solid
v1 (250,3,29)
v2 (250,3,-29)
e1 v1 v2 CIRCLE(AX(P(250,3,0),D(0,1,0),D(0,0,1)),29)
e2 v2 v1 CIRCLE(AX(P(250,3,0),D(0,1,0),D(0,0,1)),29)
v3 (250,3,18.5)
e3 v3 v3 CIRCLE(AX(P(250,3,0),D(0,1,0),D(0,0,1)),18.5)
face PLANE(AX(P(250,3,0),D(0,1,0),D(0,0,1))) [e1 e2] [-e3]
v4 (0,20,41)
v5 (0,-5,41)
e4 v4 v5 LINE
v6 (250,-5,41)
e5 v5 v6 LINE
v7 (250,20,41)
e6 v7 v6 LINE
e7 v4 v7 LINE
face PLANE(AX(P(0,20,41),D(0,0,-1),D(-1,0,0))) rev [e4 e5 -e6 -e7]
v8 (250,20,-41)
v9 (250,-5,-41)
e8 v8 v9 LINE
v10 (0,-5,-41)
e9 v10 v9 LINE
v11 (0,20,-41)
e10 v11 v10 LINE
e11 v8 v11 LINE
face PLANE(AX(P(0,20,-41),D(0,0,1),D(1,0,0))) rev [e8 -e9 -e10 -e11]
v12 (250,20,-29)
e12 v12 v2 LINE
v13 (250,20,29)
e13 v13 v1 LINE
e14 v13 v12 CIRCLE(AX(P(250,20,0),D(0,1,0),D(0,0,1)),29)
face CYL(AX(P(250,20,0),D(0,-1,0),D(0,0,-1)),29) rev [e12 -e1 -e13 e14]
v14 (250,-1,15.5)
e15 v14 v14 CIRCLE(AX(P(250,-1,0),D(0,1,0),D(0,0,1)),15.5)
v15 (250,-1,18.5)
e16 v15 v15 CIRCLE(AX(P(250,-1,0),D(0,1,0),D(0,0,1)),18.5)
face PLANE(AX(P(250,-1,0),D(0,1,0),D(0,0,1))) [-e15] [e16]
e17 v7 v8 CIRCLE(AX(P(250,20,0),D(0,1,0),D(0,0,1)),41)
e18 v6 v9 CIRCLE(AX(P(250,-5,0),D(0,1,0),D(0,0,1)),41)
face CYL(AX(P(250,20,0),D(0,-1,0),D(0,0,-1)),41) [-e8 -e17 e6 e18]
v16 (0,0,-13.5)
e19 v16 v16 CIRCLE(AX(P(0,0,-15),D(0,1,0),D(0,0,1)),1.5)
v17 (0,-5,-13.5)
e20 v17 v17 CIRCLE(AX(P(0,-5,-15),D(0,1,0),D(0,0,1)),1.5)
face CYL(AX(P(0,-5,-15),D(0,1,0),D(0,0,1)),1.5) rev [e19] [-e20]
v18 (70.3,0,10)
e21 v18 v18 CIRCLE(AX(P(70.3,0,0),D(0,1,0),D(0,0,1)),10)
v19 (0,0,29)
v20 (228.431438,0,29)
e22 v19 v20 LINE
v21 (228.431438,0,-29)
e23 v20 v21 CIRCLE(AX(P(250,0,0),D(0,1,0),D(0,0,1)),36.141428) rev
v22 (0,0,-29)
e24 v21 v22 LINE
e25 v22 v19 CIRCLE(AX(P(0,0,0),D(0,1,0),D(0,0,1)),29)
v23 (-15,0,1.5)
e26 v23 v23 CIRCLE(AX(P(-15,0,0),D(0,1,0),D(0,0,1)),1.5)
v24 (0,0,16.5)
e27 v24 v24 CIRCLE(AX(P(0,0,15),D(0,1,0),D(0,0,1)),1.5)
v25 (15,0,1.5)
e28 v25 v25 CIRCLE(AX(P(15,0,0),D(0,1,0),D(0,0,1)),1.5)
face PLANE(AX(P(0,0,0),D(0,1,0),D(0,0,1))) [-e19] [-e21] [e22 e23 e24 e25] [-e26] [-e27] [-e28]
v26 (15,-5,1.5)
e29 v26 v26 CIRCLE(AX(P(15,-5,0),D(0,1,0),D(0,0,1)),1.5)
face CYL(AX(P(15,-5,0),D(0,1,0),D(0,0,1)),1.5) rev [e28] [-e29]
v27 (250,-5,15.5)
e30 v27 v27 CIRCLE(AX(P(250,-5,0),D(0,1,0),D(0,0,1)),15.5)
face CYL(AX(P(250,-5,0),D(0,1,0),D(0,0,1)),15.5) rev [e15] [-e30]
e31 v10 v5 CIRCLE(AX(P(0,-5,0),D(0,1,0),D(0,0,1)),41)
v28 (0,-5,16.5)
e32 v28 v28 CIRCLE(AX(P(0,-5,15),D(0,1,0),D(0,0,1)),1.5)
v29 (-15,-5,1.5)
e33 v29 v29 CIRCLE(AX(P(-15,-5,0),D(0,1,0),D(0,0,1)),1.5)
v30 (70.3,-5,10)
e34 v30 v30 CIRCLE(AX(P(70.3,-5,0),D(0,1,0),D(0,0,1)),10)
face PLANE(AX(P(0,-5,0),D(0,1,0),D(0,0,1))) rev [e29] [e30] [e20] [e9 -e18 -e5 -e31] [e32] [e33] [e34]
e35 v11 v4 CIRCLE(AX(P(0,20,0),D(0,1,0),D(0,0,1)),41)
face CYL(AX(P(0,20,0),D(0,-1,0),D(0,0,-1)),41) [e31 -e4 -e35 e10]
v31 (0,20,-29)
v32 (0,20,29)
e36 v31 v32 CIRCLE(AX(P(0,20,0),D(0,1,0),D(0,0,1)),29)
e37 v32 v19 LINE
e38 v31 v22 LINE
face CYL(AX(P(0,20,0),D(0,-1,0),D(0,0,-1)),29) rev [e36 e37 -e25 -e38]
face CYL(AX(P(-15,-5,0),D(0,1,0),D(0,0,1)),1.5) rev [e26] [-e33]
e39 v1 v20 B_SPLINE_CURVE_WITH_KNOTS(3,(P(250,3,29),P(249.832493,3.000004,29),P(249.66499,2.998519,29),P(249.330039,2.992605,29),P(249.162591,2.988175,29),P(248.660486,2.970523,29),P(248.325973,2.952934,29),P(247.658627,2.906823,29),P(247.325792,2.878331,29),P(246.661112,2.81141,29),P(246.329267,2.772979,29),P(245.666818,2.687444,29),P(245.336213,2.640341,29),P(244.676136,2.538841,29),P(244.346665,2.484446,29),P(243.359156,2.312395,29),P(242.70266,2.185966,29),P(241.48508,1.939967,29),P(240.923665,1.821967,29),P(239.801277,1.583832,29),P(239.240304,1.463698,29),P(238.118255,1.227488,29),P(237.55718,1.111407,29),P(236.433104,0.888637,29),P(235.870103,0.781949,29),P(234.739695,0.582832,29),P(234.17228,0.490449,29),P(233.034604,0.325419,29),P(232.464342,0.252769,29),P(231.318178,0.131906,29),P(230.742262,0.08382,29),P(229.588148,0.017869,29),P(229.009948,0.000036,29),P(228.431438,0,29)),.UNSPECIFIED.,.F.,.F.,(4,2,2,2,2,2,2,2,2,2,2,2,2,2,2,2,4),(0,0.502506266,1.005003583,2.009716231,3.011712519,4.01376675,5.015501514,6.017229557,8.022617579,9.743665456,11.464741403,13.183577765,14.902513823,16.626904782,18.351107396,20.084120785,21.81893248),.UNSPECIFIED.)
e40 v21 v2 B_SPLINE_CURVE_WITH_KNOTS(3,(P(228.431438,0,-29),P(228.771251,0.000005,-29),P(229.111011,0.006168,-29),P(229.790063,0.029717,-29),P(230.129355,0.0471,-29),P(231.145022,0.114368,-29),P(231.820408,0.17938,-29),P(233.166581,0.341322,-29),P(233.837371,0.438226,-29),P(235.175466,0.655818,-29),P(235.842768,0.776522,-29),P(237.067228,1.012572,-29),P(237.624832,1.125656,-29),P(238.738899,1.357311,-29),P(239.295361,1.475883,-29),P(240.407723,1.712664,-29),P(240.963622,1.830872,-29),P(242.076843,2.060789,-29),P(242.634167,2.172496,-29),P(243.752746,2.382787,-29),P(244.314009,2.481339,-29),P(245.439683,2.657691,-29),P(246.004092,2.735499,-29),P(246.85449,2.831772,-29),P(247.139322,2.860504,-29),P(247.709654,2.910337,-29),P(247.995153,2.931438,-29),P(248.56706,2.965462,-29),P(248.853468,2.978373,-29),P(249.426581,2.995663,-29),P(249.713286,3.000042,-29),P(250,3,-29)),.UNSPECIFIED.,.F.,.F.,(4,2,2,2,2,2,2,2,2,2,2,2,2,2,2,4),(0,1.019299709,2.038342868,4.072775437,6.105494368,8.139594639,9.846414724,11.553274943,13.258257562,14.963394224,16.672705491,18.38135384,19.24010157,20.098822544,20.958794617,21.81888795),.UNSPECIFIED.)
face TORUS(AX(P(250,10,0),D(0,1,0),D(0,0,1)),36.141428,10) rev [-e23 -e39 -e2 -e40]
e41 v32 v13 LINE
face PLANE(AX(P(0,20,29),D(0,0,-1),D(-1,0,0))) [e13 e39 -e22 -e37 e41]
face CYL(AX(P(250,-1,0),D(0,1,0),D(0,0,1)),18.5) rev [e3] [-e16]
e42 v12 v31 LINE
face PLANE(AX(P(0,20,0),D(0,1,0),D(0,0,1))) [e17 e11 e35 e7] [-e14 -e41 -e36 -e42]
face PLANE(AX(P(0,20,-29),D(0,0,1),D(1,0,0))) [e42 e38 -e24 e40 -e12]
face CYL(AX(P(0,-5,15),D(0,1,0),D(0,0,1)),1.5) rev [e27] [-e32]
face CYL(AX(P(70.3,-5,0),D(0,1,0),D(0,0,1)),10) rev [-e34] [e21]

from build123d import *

# Parameters (mm, degrees)
BOSS_EXTRUDE1_DEPTH     = 20
BOSS_EXTRUDE2_START     = -5
BOSS_EXTRUDE2_DEPTH     = 5
CUT_EXTRUDE1_DEPTH      = 295.553899991
CUT_EXTRUDE1_DEPTH_BACK = 295.553899991
SKETCH3_R               = 1.5
SKETCH4_R               = 29
BOSS_EXTRUDE3_DEPTH     = 3
SKETCH5_R               = 18.5
CUT_EXTRUDE2_DEPTH      = 4
CUT_EXTRUDE3_DEPTH      = 295.623488541
CUT_EXTRUDE3_DEPTH_BACK = 295.623488541
SKETCH6_R               = 15.5
FILLET1_R               = 10
CUT_EXTRUDE4_DEPTH      = 295.553899998
CUT_EXTRUDE4_DEPTH_BACK = 295.553899998
SKETCH7_R               = 10


with BuildPart() as part:
    # Sketch1 → Boss-Extrude1 (new body)
    with BuildSketch(Plane(origin=(0, 0, 0), x_dir=(1, 0, 0), z_dir=(0, 1, 0))):
        with BuildLine():
            Line((0, -41), (250, -41))
            ThreePointArc((250, -41), (291, 0), (250, 41))
            Line((250, 41), (0, 41))
            ThreePointArc((0, 41), (-41, 0), (0, -41))
        make_face()
        with BuildLine():
            Line((0, 29), (250, 29))
            ThreePointArc((250, 29), (279, 0), (250, -29))
            Line((250, -29), (0, -29))
            ThreePointArc((0, -29), (-29, 0), (0, 29))
        make_face(mode=Mode.SUBTRACT)
    extrude(amount=BOSS_EXTRUDE1_DEPTH)

    # Sketch1<2> → Boss-Extrude2 (add)
    with BuildSketch(Plane(origin=(0, 0, 0), x_dir=(1, 0, 0), z_dir=(0, 1, 0)).offset(BOSS_EXTRUDE2_START)):
        with BuildLine():
            ThreePointArc((0, 41), (-41, 0), (0, -41))
            Line((0, -41), (250, -41))
            ThreePointArc((250, -41), (291, 0), (250, 41))
            Line((250, 41), (0, 41))
        make_face()
    extrude(amount=BOSS_EXTRUDE2_DEPTH)

    # Sketch3 → Cut-Extrude1 (cut, two sides: drawn at the far end of the back side and taken through both)
    with BuildSketch(Plane(origin=(0, 0, 0), x_dir=(1, 0, 0), z_dir=(0, 1, 0)).offset(-CUT_EXTRUDE1_DEPTH_BACK)):
        with Locations(Location((0, 15, 0), (0, 0, 270))):
            Circle(SKETCH3_R)
        with Locations(Location((15, 0, 0), (0, 0, 270))):
            Circle(SKETCH3_R)
        with Locations(Location((0, -15, 0), (0, 0, 270))):
            Circle(SKETCH3_R)
        with Locations(Location((-15, 0, 0), (0, 0, 270))):
            Circle(SKETCH3_R)
    extrude(amount=CUT_EXTRUDE1_DEPTH + CUT_EXTRUDE1_DEPTH_BACK, mode=Mode.SUBTRACT)

    # Sketch4 → Boss-Extrude3 (add)
    with BuildSketch(Plane(origin=(0, 0, 0), x_dir=(1, 0, 0), z_dir=(0, 1, 0))):
        with Locations((250, 0)):
            Circle(SKETCH4_R)
    extrude(amount=BOSS_EXTRUDE3_DEPTH)

    # Sketch5 → Cut-Extrude2 (cut)
    with BuildSketch(Plane(origin=(0, 3, 0), x_dir=(1, 0, 0), z_dir=(0, 1, 0))):
        with Locations(Location((250, 0, 0), (0, 0, 270))):
            Circle(SKETCH5_R)
    extrude(amount=-CUT_EXTRUDE2_DEPTH, mode=Mode.SUBTRACT)

    # Sketch6 → Cut-Extrude3 (cut, two sides: drawn at the far end of the back side and taken through both)
    with BuildSketch(Plane(origin=(0, -1, 0), x_dir=(1, 0, 0), z_dir=(0, 1, 0)).offset(-CUT_EXTRUDE3_DEPTH_BACK)):
        with Locations(Location((250, 0, 0), (0, 0, 270))):
            Circle(SKETCH6_R)
    extrude(amount=CUT_EXTRUDE3_DEPTH + CUT_EXTRUDE3_DEPTH_BACK, mode=Mode.SUBTRACT)

    # Fillet1
    # the kernel refuses this fillet: 10 mm, written as the material it adds along each edge
    with BuildSketch(Plane(origin=(250, 0, 0), x_dir=(0.5782894613752282, 0, -0.8158316608604672), z_dir=(0.8158316608604672, 0, 0.5782894613752282))) as fillet1_piece_1:
        with BuildLine():
            CenterArc((36.141428429, 10), FILLET1_R, 224.427004001, 45.572995999)
            Line((36.141428429, 0), (36.141428429, -0.2))
            Line((36.141428429, -0.2), (29, -0.2))
            Line((29, -0.2), (28.8, 0))
            ThreePointArc((28.8, 0), (28.8, 1.5), (28.857171431, 2.86))
            Line((28.857171431, 2.86), (29, 3))
        make_face()
    revolve(axis=Axis((250, 0, 0), (0, 1, 0)), revolution_arc=250.660644369)

    # Sketch7 → Cut-Extrude4 (cut, two sides: drawn at the far end of the back side and taken through both)
    with BuildSketch(Plane(origin=(0, 0, 0), x_dir=(1, 0, 0), z_dir=(0, 1, 0)).offset(-CUT_EXTRUDE4_DEPTH_BACK)):
        with Locations(Location((70.3, 0, 0), (0, 0, 270))):
            Circle(SKETCH7_R)
    extrude(amount=CUT_EXTRUDE4_DEPTH + CUT_EXTRUDE4_DEPTH_BACK, mode=Mode.SUBTRACT)


solid = part.part
